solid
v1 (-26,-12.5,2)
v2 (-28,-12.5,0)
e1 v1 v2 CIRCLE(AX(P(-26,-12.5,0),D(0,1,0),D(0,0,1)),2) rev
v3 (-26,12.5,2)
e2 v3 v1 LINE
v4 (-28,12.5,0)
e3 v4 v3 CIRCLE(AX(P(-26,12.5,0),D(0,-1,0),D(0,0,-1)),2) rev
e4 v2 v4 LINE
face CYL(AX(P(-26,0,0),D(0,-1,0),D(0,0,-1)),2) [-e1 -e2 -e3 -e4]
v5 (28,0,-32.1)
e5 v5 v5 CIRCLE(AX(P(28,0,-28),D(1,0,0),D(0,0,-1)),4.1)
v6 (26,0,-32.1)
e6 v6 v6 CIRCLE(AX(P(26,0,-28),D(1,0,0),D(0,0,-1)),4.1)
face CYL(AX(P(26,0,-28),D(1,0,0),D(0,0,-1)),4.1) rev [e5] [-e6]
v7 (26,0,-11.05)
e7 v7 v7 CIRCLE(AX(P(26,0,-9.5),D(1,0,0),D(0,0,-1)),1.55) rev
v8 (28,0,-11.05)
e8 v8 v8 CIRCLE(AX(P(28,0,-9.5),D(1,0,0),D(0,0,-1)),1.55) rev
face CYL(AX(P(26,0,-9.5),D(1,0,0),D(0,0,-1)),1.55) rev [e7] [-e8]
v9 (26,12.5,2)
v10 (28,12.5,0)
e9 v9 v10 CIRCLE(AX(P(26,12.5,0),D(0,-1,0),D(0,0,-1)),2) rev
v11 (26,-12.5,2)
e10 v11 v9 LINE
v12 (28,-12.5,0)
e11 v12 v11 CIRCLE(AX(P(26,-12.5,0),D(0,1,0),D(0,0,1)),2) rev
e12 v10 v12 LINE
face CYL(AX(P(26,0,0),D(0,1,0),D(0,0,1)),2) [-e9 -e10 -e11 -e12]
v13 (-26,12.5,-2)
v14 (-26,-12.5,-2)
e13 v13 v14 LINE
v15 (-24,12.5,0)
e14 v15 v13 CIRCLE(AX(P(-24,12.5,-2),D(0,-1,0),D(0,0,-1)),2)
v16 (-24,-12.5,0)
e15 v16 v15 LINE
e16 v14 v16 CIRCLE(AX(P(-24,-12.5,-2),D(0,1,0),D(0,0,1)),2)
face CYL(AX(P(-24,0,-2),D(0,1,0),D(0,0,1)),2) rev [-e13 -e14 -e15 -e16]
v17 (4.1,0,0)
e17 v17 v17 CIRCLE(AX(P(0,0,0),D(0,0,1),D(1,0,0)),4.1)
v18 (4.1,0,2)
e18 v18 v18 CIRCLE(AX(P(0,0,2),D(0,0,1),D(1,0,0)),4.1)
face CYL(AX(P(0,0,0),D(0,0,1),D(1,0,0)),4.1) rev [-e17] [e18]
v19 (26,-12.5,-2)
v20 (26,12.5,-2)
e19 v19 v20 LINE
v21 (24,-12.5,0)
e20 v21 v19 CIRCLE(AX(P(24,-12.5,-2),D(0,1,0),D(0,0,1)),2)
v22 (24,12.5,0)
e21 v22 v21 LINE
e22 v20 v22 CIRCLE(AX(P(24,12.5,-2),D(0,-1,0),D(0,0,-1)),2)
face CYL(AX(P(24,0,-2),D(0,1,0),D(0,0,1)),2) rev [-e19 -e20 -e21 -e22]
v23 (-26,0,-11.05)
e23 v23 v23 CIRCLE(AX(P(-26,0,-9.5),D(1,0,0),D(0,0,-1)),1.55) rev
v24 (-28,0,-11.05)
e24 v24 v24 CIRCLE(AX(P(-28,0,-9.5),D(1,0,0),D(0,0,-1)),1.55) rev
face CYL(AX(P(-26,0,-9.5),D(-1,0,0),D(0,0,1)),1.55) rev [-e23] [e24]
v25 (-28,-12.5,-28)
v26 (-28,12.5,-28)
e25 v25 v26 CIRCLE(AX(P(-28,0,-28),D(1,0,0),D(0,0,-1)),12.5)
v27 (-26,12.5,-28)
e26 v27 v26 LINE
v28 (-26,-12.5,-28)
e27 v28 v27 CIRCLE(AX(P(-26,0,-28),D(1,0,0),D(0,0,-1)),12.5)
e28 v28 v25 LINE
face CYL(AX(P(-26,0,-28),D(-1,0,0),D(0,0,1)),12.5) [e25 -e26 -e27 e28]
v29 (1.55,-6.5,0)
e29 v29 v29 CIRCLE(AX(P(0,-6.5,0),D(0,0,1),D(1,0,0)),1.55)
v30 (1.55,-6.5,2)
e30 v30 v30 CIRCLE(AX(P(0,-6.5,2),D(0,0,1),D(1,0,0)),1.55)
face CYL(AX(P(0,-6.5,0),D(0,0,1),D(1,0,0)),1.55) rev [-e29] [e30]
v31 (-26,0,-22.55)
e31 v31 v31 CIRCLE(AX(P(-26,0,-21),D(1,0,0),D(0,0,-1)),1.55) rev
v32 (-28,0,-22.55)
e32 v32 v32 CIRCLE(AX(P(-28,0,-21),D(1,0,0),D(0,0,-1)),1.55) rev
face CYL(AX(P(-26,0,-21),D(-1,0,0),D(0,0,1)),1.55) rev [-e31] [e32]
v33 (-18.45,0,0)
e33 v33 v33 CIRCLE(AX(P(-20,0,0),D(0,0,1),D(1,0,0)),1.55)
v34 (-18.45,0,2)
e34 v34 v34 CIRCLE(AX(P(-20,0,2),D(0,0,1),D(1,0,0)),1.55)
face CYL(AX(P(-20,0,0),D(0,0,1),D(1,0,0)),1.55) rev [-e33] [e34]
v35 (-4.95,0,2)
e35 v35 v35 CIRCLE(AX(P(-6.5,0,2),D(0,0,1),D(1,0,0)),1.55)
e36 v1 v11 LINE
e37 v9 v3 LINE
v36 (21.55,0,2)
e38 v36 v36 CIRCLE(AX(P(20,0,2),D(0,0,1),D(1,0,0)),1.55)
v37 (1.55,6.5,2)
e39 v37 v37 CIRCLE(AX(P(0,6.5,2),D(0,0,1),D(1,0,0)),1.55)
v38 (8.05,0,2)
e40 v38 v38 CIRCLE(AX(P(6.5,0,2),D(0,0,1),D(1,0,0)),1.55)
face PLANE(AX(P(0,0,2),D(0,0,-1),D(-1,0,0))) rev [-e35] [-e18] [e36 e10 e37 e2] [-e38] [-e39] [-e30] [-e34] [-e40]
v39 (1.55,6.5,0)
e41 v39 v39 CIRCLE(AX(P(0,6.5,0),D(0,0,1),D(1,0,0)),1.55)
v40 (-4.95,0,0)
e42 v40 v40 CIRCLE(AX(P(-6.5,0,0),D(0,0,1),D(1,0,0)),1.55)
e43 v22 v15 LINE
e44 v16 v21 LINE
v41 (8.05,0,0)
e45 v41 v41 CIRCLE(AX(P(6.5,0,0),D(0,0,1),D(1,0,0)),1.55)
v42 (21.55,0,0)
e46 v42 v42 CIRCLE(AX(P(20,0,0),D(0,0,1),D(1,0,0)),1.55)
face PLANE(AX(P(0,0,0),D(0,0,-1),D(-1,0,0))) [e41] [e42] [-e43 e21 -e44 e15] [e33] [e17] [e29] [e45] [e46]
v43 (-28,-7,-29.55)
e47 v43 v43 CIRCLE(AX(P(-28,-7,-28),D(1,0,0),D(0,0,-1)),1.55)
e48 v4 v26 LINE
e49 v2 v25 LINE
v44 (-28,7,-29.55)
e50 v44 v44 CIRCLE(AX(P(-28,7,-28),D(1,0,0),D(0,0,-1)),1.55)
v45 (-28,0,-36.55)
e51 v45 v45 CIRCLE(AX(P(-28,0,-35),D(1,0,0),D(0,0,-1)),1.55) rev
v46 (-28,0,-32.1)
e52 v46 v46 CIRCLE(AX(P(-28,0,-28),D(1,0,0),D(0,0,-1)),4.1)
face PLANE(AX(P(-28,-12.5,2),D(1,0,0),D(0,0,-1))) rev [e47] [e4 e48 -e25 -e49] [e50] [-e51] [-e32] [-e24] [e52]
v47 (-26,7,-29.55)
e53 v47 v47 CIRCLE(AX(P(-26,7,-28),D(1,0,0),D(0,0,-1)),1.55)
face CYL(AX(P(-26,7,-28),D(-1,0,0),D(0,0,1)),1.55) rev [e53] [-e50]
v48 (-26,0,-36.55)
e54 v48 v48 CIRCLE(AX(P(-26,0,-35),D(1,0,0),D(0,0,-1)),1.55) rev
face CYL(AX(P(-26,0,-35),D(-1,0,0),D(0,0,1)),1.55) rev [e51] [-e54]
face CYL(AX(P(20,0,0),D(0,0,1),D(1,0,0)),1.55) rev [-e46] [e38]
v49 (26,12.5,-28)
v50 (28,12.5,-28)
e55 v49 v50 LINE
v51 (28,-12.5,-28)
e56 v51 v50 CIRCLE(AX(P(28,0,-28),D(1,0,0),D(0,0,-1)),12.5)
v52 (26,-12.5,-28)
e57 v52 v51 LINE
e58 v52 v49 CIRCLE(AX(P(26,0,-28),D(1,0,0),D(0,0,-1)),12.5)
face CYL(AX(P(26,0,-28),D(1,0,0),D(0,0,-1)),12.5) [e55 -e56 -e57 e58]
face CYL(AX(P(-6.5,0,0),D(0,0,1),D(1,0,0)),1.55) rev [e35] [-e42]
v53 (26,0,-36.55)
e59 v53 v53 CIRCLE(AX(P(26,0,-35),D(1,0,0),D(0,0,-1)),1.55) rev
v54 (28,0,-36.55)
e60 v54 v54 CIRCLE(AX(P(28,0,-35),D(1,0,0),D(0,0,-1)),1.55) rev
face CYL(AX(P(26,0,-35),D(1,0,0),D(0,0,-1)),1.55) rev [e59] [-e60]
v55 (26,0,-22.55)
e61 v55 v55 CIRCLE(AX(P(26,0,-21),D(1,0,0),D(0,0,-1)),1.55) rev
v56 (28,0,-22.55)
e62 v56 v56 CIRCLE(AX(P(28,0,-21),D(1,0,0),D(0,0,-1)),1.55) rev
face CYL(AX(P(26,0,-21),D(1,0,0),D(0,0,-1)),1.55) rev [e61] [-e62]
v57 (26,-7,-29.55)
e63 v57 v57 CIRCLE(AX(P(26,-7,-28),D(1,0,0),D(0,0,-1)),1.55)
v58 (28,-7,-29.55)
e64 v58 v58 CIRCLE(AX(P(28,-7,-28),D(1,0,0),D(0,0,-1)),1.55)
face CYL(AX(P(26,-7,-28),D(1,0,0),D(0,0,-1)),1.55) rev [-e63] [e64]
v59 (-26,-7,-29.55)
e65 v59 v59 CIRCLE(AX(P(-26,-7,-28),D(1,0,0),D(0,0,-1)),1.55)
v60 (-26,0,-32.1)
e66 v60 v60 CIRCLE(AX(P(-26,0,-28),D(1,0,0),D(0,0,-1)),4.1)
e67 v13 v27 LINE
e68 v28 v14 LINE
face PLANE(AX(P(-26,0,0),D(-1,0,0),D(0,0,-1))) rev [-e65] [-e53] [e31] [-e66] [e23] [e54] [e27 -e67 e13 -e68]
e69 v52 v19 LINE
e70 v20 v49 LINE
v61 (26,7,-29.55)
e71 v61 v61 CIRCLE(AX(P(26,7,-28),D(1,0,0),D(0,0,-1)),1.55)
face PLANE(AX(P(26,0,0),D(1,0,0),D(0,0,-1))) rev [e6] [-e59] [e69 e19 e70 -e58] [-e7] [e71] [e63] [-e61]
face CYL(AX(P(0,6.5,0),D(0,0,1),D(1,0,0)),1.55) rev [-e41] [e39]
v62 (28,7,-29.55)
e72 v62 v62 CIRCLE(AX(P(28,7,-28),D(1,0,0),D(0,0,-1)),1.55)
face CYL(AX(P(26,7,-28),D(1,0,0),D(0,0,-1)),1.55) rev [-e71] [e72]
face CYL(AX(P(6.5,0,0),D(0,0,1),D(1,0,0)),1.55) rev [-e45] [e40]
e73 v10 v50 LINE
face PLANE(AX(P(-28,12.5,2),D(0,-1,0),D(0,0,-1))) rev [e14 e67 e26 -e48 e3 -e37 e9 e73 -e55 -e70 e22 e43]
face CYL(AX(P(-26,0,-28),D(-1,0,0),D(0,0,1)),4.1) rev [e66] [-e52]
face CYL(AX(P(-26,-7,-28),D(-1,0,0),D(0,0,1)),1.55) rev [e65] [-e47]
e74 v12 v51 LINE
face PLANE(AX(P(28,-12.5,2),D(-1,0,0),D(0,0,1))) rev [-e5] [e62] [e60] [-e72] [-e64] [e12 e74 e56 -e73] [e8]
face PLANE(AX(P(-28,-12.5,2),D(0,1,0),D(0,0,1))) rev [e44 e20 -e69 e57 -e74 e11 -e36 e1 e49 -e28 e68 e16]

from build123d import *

# Parameters (mm, degrees)
SKETCH_1_W            = 56
SKETCH_1_H            = 25
EXTRUDE_1_DEPTH       = 2
EXTRUDE_START         = -2
EXTRUDE_2_OUTLINE_R   = 1.55
EXTRUDE_2_OUTLINE_R_2 = 4.1
EXTRUDE_2_DEPTH       = 2
SKETCH_3_R            = 1.55
SKETCH_3_R_2          = 4.1
CUT_EXTRUDE_1_DEPTH   = 2
FILLET_1_R            = 2


# Read off the part's stored shape, not the designer's step: 凸台-拉伸2
with BuildPart() as part:
    # 草图1 → 凸台-拉伸1 (new body)
    with BuildSketch(Plane.XY):
        Rectangle(SKETCH_1_W, SKETCH_1_H)
    extrude(amount=EXTRUDE_1_DEPTH)

    # 凸台-拉伸2 outline → 凸台-拉伸2 (add)
    with BuildSketch(Plane(origin=(28, 0, 0), x_dir=(0, 0, -1), z_dir=(1, 0, 0)).offset(EXTRUDE_START)):
        with BuildLine():
            Line((0, -12.5), (28, -12.5))
            ThreePointArc((28, -12.5), (40.5, 0), (28, 12.5))
            Line((28, 12.5), (0, 12.5))
            Line((0, 12.5), (0, -12.5))
        make_face()
        with Locations((28, -7)):
            Circle(EXTRUDE_2_OUTLINE_R, mode=Mode.SUBTRACT)
        with Locations((9.5, 0)):
            Circle(EXTRUDE_2_OUTLINE_R, mode=Mode.SUBTRACT)
        with Locations((21, 0)):
            Circle(EXTRUDE_2_OUTLINE_R, mode=Mode.SUBTRACT)
        with Locations((28, 0)):
            Circle(EXTRUDE_2_OUTLINE_R_2, mode=Mode.SUBTRACT)
        with Locations((35, 0)):
            Circle(EXTRUDE_2_OUTLINE_R, mode=Mode.SUBTRACT)
        with Locations((28, 7)):
            Circle(EXTRUDE_2_OUTLINE_R, mode=Mode.SUBTRACT)
    extrude_2 = extrude(amount=EXTRUDE_2_DEPTH)

    # 镜向2: 凸台-拉伸2 across plane
    add(extrude_2.mirror(Plane.ZY))

    # 草图3 → 切除-拉伸1 (cut)
    with BuildSketch(Plane.XY.offset(2)):
        with Locations((-20, 0)):
            Circle(SKETCH_3_R)
        with Locations((-6.5, 0)):
            Circle(SKETCH_3_R)
        with Locations((6.5, 0)):
            Circle(SKETCH_3_R)
        with Locations((0, -6.5)):
            Circle(SKETCH_3_R)
        Circle(SKETCH_3_R_2)
        with Locations((0, 6.5)):
            Circle(SKETCH_3_R)
        with Locations((20, 0)):
            Circle(SKETCH_3_R)
    extrude(amount=-CUT_EXTRUDE_1_DEPTH, mode=Mode.SUBTRACT)

    # 圆角1
    fillet_1_edges = [part.edges().sort_by_distance(p)[0] for p in [
        (-28, 0, 2),
        (26, 0, 0),
        (-26, 0, 0),
        (28, 0, 2),
    ]]
    fillet(fillet_1_edges, radius=FILLET_1_R)


solid = part.part
